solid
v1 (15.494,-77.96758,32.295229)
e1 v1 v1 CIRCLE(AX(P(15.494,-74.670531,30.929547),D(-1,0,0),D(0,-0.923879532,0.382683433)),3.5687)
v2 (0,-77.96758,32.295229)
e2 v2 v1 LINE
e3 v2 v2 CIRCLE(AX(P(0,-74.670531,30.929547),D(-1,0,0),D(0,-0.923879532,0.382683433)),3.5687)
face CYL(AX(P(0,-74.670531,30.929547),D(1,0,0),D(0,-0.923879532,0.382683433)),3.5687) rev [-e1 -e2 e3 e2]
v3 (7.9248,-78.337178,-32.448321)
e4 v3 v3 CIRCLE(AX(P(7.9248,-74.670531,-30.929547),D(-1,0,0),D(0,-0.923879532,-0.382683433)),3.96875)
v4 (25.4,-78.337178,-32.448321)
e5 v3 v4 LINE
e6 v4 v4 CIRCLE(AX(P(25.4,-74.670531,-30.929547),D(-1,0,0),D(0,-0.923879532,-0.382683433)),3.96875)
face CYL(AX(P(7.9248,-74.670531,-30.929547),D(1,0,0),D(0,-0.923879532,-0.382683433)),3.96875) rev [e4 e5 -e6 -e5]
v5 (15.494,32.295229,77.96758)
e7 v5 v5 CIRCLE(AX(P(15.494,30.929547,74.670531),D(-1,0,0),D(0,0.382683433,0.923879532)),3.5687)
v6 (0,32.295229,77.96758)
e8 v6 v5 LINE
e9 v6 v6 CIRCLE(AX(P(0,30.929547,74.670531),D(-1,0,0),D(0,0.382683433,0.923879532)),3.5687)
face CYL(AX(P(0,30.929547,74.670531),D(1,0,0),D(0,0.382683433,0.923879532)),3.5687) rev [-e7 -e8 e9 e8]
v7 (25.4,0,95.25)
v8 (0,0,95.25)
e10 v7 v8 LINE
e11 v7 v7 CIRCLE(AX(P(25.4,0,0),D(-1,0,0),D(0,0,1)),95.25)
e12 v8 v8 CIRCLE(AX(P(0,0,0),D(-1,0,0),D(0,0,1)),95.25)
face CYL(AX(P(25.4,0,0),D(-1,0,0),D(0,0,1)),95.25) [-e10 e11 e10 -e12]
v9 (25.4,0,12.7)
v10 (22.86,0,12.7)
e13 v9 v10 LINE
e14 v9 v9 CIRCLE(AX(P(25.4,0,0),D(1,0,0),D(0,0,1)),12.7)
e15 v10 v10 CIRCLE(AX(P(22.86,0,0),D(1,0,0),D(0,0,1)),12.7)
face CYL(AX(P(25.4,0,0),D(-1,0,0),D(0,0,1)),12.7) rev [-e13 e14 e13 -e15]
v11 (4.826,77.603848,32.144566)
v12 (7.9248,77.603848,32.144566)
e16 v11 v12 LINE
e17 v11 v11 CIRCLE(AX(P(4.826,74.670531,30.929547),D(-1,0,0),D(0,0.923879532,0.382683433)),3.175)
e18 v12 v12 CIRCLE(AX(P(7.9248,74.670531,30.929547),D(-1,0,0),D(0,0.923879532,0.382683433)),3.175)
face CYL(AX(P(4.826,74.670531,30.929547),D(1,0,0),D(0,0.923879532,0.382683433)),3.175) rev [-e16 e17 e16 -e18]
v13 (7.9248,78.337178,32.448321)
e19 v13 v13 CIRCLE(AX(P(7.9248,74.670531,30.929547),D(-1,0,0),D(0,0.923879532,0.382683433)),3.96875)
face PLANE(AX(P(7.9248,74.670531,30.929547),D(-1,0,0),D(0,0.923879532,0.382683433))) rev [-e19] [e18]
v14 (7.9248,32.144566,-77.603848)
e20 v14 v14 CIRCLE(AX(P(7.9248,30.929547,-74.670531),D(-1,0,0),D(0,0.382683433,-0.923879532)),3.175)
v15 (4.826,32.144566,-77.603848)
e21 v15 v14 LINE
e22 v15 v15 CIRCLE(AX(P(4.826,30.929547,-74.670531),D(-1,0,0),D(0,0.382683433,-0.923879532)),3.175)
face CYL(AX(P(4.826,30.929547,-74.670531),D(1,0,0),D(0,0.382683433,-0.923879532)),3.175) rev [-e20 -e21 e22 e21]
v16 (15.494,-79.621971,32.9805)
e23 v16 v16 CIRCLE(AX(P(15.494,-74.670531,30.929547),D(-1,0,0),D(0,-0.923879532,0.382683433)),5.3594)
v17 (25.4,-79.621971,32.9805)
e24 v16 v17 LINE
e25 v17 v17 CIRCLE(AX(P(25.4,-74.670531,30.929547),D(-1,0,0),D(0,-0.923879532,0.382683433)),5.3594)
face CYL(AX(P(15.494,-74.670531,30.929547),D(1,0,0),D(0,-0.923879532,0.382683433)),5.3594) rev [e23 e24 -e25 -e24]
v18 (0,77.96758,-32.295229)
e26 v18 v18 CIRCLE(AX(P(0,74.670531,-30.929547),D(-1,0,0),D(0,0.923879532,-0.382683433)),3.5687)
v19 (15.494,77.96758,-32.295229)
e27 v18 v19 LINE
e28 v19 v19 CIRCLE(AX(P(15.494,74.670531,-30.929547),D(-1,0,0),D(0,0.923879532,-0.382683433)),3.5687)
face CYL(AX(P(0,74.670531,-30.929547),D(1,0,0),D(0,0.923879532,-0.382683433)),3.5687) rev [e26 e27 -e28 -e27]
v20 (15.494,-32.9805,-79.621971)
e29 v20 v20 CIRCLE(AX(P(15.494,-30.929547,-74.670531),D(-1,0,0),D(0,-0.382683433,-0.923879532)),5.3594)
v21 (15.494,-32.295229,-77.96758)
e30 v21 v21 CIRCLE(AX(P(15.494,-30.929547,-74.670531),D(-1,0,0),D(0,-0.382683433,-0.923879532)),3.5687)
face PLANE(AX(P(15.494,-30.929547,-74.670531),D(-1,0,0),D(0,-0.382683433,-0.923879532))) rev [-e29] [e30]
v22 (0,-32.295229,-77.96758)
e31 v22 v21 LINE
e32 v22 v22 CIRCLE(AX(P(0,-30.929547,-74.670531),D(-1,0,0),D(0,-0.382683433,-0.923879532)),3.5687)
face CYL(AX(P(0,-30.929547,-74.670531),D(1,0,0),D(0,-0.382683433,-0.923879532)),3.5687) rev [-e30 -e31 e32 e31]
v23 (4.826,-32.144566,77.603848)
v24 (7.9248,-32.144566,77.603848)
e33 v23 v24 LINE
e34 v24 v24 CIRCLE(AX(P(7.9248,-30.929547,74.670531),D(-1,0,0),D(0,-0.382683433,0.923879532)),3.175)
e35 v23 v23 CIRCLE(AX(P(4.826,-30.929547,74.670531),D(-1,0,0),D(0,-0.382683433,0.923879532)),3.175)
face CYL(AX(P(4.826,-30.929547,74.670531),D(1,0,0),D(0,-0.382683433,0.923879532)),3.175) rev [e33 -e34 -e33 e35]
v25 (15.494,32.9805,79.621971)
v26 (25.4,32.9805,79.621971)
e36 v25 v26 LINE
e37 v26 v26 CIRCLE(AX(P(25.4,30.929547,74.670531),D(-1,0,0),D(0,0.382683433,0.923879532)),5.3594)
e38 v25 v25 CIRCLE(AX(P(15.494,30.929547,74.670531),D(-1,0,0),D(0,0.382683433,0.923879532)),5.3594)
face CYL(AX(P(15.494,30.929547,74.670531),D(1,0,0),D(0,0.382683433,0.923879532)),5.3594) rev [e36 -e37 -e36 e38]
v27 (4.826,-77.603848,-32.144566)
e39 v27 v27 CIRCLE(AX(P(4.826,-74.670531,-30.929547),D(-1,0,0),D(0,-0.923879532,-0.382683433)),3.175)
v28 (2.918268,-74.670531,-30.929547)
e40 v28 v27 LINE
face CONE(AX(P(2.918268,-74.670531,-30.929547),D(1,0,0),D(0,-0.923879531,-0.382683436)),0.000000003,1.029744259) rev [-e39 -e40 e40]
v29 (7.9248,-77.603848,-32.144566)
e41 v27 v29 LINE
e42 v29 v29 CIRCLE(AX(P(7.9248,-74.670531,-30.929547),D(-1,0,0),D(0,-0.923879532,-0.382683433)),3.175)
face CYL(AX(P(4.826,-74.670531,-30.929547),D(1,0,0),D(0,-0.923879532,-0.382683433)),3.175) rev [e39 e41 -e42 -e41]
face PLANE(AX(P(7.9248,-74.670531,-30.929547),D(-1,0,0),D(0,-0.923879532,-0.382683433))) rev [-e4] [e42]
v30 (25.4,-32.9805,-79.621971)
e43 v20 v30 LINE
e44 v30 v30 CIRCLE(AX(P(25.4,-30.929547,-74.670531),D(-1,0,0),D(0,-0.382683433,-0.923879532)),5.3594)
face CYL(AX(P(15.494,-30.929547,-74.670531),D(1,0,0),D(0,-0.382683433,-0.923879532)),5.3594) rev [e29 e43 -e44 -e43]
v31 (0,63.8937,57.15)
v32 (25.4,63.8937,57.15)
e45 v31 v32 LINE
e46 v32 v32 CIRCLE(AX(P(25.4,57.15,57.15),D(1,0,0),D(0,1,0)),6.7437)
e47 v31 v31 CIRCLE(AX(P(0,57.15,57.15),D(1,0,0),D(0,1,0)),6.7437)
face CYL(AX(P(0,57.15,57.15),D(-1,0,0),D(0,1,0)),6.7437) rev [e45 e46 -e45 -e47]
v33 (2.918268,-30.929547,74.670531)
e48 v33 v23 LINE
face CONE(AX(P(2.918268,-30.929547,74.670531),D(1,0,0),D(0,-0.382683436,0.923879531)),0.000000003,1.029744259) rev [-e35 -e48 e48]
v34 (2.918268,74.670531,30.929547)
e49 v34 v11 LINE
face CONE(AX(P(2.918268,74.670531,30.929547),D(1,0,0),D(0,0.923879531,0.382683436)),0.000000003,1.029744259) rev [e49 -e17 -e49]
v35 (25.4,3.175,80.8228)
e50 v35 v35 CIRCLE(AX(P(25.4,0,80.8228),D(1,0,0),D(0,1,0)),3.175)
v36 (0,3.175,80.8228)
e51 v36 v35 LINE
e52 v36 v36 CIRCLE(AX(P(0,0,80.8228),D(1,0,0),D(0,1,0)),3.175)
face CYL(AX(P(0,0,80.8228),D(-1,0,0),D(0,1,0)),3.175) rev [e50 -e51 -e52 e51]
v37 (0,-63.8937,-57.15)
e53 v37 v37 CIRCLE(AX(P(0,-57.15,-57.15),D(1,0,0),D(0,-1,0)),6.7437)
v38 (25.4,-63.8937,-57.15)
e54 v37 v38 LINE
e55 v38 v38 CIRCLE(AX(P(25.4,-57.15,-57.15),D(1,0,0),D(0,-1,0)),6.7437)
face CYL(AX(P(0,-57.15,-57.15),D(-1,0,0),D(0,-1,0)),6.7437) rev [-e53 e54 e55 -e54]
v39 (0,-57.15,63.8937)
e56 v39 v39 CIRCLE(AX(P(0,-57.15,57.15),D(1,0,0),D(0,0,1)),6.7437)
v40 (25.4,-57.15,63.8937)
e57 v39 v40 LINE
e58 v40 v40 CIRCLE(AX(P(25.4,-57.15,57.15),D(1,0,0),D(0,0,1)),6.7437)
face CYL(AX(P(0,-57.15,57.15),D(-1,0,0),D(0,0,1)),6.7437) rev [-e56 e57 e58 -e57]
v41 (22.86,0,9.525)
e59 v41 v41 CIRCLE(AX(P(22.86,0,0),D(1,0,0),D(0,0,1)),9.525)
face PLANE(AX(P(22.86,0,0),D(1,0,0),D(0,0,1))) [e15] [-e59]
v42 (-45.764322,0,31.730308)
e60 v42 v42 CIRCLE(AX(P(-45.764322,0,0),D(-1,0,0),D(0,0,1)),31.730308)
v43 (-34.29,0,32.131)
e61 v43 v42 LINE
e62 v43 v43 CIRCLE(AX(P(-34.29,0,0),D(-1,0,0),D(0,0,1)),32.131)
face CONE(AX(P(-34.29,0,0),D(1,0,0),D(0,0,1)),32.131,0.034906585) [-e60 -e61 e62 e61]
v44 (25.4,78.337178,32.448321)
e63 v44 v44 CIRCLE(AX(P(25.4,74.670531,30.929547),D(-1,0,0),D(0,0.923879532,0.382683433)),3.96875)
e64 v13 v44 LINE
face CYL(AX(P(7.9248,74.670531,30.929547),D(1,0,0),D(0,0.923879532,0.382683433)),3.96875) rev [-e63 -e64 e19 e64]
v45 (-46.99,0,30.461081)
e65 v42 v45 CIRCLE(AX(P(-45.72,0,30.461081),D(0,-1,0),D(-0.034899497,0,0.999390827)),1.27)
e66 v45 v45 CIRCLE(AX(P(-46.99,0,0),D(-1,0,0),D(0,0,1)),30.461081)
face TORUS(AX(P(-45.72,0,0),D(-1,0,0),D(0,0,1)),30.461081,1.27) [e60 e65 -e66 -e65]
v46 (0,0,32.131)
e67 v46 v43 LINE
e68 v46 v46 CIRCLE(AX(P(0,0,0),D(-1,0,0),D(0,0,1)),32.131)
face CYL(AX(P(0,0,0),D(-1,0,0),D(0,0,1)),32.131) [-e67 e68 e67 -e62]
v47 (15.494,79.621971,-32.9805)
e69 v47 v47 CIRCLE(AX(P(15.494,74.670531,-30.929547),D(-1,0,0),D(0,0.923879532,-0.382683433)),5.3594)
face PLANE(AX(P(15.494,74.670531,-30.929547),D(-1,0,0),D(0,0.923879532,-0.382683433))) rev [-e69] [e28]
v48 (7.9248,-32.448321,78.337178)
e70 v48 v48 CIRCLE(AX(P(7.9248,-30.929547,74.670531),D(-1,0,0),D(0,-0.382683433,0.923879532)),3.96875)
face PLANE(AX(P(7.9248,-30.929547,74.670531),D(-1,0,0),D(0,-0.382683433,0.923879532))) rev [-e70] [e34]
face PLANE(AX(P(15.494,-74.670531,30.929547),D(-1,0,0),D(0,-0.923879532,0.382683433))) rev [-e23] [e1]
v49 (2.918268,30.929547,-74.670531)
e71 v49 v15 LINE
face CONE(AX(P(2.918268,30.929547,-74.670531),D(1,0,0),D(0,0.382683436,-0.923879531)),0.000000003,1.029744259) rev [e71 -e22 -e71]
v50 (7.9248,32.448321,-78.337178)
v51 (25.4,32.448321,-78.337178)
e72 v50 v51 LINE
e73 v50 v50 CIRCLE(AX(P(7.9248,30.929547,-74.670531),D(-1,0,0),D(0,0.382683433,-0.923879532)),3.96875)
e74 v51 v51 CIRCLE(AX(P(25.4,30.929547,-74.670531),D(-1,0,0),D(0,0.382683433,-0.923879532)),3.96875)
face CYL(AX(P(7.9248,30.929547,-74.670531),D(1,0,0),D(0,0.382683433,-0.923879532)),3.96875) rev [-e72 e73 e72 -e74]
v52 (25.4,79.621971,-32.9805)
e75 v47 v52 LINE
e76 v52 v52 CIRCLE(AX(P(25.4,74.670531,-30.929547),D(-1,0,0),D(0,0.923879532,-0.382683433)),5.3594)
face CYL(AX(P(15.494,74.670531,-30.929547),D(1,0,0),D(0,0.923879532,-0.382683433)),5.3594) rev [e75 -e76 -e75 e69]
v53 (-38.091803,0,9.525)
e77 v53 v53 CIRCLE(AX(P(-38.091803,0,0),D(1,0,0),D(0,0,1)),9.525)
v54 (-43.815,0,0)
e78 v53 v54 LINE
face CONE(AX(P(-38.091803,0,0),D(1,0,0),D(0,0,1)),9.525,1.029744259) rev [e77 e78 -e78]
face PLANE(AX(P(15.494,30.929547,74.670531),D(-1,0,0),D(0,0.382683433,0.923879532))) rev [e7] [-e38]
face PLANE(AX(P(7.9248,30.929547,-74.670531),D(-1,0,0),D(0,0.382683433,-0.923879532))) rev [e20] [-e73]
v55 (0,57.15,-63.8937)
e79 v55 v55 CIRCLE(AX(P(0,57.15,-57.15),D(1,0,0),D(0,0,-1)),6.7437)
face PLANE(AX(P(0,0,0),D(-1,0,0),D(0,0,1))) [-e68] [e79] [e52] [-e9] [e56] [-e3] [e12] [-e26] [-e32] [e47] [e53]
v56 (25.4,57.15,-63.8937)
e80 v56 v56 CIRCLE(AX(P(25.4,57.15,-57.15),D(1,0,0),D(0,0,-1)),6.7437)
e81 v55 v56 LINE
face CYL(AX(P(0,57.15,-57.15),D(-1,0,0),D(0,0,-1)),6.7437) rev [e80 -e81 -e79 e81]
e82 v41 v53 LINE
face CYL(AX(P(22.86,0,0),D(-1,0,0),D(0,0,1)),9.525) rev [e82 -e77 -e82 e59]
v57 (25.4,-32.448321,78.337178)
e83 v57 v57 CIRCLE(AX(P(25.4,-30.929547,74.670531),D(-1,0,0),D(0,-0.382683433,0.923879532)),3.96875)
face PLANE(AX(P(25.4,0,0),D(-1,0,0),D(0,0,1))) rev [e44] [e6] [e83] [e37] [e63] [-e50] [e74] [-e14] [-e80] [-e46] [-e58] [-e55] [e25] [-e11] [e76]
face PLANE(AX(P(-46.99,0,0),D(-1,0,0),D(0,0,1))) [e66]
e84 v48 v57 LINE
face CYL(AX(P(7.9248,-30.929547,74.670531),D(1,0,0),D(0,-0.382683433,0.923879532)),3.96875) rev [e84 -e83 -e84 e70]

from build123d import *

# Parameters (mm, degrees)
F2_R             = 6.7437
F3_DEPTH         = 25.4
F3_COPIES_COUNT  = 4
F8_COPIES_COUNT  = 4
F11_COPIES_COUNT = 4
F12_R            = 3.175
F13_DEPTH        = 25.4


# Not quite as in the source:
# - a pattern or mirror of a feature is missing from the dataset's text; its kind, count and spacing are read off the source's solid


with BuildPart() as f1:
    # F0 (on Front) → F1 (revolve)
    with BuildSketch(Plane.XZ):
        with BuildLine():
            Line((-46.99, 30.4610814834), (-46.99, 0))
            Line((-46.99, 0), (25.4, 0))
            Line((25.4, 0), (25.4, 95.25))
            Line((25.4, 95.25), (0, 95.25))
            Line((0, 95.25), (0, 32.131))
            Line((0, 32.131), (-34.29, 32.131))
            Line((-34.29, 32.131), (-45.7643223608, 31.7303078338))
            ThreePointArc((-45.7643223608, 31.7303078338), (-46.6335615464, 31.3432976139), (-46.99, 30.4610814834))
        make_face()
    revolve(axis=Axis((-33.2340214019, 0, 0), (-1, 0, 0)))

    # F2 (on Right) → F3 (cut, through all)
    with BuildSketch(Plane.YZ):
        with Locations((57.15, 57.15)):
            Circle(F2_R)
    f3 = extrude(amount=F3_DEPTH, mode=Mode.SUBTRACT)

    # F3_copies: F3 ×4 about axis
    f3_copies_axis = Axis((0, 0, 0), (1, 0, 0))
    for i in range(1, F3_COPIES_COUNT):
        add(f3.rotate(f3_copies_axis, i * 360 / F3_COPIES_COUNT), mode=Mode.SUBTRACT)

    # F4 (on Front) → F5 (revolve, cut)
    with BuildSketch(Plane.XZ):
        Polygon((-38.0918026038, 9.525), (-43.815, 0), (25.4, 0), (25.4, 12.7), (22.86, 12.7), (22.86, 9.525), align=None)
    revolve(axis=Axis((25.4, 0, 0), (1, 0, 0)), mode=Mode.SUBTRACT)

    # F7 (on line) → F8 (revolve, cut)
    with BuildSketch(Plane(origin=(0, 0, 0), x_dir=(-1, 0, 0), z_dir=(0, 0.9238795325, -0.3826834324))):
        Polygon((-25.4, 80.8228), (0, 80.8228), (0, 84.3915), (-15.494, 84.3915), (-15.494, 86.1822), (-25.4, 86.1822), align=None)
    f8 = revolve(axis=Axis((19.0941668783, 30.9295465174, 74.6705306803), (-1, 0, 0)), mode=Mode.SUBTRACT)

    # F8_copies: F8 ×4 about axis
    f8_copies_axis = Axis((0, 0, 0), (1, 0, 0))
    for i in range(1, F8_COPIES_COUNT):
        add(f8.rotate(f8_copies_axis, i * 360 / F8_COPIES_COUNT), mode=Mode.SUBTRACT)

    # F10 (on line) → F11 (revolve, cut)
    with BuildSketch(Plane(origin=(0, 0, 0), x_dir=(-1, 0, 0), z_dir=(0, 0.9238795325, 0.3826834324))):
        Polygon((-25.4, 84.79155), (-25.4, 80.8228), (-2.9182675346, 80.8228), (-4.826, 83.9978), (-7.9248, 83.9978), (-7.9248, 84.79155), align=None)
    f11 = revolve(axis=Axis((19.9955312124, -30.9295465174, 74.6705306803), (-1, 0, 0)), mode=Mode.SUBTRACT)

    # F11_copies: F11 ×4 about axis
    f11_copies_axis = Axis((0, 0, 0), (1, 0, 0))
    for i in range(1, F11_COPIES_COUNT):
        add(f11.rotate(f11_copies_axis, i * 360 / F11_COPIES_COUNT), mode=Mode.SUBTRACT)

    # F12 (on Right) → F13 (cut, through all)
    with BuildSketch(Plane.YZ):
        with Locations((0, 80.8228)):
            Circle(F12_R)
    extrude(amount=F13_DEPTH, mode=Mode.SUBTRACT)


solid = f1.part
